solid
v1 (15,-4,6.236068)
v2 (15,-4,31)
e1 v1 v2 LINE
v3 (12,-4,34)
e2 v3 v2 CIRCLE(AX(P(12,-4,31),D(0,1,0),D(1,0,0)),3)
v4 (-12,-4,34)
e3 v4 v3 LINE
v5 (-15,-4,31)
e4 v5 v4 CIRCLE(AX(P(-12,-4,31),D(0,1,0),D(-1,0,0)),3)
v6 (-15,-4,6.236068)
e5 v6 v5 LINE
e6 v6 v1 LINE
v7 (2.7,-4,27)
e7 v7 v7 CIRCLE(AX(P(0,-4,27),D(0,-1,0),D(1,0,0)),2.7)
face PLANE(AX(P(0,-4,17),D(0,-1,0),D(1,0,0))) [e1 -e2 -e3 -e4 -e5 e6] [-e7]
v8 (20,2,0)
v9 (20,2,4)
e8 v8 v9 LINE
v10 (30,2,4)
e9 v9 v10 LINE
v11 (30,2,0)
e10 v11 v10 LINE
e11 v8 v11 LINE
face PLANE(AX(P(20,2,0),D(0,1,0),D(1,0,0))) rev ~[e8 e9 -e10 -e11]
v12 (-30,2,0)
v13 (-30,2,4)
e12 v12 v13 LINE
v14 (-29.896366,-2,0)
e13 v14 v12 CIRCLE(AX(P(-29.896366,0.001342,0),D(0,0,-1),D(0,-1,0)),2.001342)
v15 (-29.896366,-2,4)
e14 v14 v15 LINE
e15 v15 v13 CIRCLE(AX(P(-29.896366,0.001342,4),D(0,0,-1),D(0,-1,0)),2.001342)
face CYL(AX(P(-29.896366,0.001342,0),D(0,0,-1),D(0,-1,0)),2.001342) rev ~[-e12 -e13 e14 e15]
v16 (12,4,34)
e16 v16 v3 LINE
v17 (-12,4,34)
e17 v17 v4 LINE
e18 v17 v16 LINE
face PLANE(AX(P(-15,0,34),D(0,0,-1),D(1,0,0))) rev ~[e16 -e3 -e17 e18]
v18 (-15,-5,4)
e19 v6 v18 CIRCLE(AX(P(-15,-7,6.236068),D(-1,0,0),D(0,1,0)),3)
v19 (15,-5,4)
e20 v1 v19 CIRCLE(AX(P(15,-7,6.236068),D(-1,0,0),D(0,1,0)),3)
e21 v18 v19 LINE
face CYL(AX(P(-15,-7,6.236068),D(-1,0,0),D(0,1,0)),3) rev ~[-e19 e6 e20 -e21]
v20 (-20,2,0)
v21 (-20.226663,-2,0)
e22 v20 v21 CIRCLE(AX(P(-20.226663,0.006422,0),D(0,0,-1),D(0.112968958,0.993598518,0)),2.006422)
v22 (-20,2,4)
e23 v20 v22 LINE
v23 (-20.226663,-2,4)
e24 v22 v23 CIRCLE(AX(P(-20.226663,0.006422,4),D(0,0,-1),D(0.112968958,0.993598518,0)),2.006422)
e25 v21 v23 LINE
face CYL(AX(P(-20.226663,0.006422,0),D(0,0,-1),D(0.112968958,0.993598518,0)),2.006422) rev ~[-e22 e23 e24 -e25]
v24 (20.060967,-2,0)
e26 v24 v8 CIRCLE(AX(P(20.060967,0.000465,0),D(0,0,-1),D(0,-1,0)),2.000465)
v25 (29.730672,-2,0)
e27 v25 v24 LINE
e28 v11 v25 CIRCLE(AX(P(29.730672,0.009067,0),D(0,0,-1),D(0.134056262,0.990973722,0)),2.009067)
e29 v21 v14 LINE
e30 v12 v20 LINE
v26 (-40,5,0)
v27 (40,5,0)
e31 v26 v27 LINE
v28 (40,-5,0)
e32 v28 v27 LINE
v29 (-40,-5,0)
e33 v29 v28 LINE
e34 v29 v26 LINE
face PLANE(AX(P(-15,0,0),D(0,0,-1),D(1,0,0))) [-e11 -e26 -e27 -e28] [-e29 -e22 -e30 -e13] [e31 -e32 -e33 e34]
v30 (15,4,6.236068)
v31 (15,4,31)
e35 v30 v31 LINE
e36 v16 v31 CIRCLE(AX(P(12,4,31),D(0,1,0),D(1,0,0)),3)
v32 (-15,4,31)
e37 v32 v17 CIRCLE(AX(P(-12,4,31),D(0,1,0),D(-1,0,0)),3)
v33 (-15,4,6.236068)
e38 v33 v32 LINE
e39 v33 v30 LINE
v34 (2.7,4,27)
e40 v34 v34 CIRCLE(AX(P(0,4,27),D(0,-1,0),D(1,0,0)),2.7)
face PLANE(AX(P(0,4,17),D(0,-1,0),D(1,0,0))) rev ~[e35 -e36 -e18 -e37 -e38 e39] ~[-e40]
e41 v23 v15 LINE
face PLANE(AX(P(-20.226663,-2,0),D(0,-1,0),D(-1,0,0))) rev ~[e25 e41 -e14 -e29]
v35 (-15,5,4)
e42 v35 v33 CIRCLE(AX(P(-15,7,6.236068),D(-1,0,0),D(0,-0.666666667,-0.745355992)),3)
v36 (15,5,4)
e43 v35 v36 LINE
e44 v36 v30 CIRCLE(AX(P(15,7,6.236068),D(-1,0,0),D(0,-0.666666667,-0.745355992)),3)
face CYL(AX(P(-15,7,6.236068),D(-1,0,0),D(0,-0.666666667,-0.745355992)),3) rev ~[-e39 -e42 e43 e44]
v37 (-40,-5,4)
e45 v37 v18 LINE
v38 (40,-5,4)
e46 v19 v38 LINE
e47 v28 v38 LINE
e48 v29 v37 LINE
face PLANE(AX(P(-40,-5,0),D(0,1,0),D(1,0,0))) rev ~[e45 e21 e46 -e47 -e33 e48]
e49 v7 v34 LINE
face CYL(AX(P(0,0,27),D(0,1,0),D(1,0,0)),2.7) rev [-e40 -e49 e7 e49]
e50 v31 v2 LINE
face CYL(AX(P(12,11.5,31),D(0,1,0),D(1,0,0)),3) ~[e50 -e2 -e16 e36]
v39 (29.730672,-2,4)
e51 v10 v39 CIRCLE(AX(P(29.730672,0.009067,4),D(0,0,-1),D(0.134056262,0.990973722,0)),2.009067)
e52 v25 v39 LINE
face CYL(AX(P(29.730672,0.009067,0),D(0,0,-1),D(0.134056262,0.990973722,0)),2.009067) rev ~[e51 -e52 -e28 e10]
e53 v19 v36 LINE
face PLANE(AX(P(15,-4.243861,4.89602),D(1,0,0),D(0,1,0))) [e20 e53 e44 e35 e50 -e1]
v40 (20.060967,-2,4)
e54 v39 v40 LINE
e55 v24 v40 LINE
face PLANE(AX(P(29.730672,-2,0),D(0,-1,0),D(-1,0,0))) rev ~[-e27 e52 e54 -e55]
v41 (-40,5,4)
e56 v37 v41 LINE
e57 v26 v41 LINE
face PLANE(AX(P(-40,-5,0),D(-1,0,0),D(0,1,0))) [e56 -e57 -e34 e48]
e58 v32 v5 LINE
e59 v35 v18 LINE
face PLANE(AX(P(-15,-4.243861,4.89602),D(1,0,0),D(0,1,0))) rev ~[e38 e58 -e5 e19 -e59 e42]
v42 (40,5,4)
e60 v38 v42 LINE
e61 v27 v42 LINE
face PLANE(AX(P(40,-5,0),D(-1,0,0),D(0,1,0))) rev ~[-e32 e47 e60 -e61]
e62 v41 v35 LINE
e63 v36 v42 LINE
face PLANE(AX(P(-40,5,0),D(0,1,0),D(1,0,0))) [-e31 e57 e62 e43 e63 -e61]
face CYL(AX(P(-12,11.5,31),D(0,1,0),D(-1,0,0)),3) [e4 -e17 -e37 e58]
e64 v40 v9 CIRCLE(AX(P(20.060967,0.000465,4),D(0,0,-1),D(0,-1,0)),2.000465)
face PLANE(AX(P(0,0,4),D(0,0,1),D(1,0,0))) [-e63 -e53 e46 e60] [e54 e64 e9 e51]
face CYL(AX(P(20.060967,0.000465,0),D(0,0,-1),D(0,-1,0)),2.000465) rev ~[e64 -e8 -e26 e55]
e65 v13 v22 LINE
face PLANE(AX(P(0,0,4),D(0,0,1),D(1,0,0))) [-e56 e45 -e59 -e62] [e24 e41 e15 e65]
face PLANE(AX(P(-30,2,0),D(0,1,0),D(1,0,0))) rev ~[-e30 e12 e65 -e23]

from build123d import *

# Parameters (mm, degrees)
F0_W        = 80
F0_H        = 10
F2_DEPTH    = 4
F1_W        = 30
F1_H        = 34
F1_R        = 2.7
F3_DEPTH    = 4
F4_T1_DEPTH = 30
F4_T3_DEPTH = 30
F4_T5_DEPTH = 23
F4_T7_DEPTH = 23


# Not quite as in the source:
# - a fillet or chamfer that OpenCascade refuses, or shapes differently, is made with other operations: its cross-section is extruded or revolved along the edge and cut away or added


with BuildPart() as f2:
    # F0 (on Top) → F2 (new body)
    with BuildSketch(Plane.XY):
        Rectangle(F0_W, F0_H)
        with BuildLine():
            ThreePointArc((-29.8963663541, -2.000000095), (-31.8970374873, -0.0504918144), (-30, 1.999999905))
            Line((-30, 1.999999905), (-20, 1.999999905))
            ThreePointArc((-20, 1.999999905), (-18.2234549617, -0.1070915702), (-20.226663407, -2.000000095))
            Line((-20.226663407, -2.000000095), (-29.8963663541, -2.000000095))
        make_face(mode=Mode.SUBTRACT)
        with BuildLine():
            ThreePointArc((20.0609671511, -2.000000095), (18.0607348524, -0.030022587), (20, 1.999999905))
            Line((20, 1.999999905), (30, 1.999999905))
            ThreePointArc((30, 1.999999905), (31.7352004336, -0.1259018267), (29.7306719608, -2.000000095))
            Line((29.7306719608, -2.000000095), (20.0609671511, -2.000000095))
        make_face(mode=Mode.SUBTRACT)
    extrude(amount=F2_DEPTH)

    # F1 (on Front) → F3 (join, symmetric)
    with BuildSketch(Plane.XZ):
        with Locations((0, 17)):
            Rectangle(F1_W, F1_H)
        with Locations((0, 27)):
            Circle(F1_R, mode=Mode.SUBTRACT)
    extrude(amount=F3_DEPTH, both=True)

    # F4: fillet of radius 3 on 4 edges, made by hand

    # F4_s2 → F4_t1 (join)
    with BuildSketch(Plane.YZ.offset(-15)):
        with BuildLine():
            ThreePointArc((5, 4), (4.2613872125, 5.0113231061), (4, 6.2360679775))
            Line((4, 6.2360679775), (4, 4))
            Line((4, 4), (5, 4))
        make_face()
    extrude(amount=F4_T1_DEPTH)

    # F4_s4 → F4_t3 (join)
    with BuildSketch(Plane.YZ.offset(-15)):
        with BuildLine():
            ThreePointArc((-4, 6.2360679775), (-4.2613872125, 5.0113231061), (-5, 4))
            Line((-5, 4), (-4, 4))
            Line((-4, 4), (-4, 6.2360679775))
        make_face()
    extrude(amount=F4_T3_DEPTH)

    # F4_s6 → F4_t5 (cut)
    with BuildSketch(Plane.XZ.offset(-11.5)):
        with BuildLine():
            ThreePointArc((15, 31), (14.1213203436, 33.1213203436), (12, 34))
            Line((12, 34), (15, 34))
            Line((15, 34), (15, 31))
        make_face()
    extrude(amount=F4_T5_DEPTH, mode=Mode.SUBTRACT)

    # F4_s8 → F4_t7 (cut)
    with BuildSketch(Plane.XZ.offset(-11.5)):
        with BuildLine():
            ThreePointArc((-15, 31), (-14.1213203436, 33.1213203436), (-12, 34))
            Line((-12, 34), (-15, 34))
            Line((-15, 34), (-15, 31))
        make_face()
    extrude(amount=F4_T7_DEPTH, mode=Mode.SUBTRACT)


solid = f2.part
